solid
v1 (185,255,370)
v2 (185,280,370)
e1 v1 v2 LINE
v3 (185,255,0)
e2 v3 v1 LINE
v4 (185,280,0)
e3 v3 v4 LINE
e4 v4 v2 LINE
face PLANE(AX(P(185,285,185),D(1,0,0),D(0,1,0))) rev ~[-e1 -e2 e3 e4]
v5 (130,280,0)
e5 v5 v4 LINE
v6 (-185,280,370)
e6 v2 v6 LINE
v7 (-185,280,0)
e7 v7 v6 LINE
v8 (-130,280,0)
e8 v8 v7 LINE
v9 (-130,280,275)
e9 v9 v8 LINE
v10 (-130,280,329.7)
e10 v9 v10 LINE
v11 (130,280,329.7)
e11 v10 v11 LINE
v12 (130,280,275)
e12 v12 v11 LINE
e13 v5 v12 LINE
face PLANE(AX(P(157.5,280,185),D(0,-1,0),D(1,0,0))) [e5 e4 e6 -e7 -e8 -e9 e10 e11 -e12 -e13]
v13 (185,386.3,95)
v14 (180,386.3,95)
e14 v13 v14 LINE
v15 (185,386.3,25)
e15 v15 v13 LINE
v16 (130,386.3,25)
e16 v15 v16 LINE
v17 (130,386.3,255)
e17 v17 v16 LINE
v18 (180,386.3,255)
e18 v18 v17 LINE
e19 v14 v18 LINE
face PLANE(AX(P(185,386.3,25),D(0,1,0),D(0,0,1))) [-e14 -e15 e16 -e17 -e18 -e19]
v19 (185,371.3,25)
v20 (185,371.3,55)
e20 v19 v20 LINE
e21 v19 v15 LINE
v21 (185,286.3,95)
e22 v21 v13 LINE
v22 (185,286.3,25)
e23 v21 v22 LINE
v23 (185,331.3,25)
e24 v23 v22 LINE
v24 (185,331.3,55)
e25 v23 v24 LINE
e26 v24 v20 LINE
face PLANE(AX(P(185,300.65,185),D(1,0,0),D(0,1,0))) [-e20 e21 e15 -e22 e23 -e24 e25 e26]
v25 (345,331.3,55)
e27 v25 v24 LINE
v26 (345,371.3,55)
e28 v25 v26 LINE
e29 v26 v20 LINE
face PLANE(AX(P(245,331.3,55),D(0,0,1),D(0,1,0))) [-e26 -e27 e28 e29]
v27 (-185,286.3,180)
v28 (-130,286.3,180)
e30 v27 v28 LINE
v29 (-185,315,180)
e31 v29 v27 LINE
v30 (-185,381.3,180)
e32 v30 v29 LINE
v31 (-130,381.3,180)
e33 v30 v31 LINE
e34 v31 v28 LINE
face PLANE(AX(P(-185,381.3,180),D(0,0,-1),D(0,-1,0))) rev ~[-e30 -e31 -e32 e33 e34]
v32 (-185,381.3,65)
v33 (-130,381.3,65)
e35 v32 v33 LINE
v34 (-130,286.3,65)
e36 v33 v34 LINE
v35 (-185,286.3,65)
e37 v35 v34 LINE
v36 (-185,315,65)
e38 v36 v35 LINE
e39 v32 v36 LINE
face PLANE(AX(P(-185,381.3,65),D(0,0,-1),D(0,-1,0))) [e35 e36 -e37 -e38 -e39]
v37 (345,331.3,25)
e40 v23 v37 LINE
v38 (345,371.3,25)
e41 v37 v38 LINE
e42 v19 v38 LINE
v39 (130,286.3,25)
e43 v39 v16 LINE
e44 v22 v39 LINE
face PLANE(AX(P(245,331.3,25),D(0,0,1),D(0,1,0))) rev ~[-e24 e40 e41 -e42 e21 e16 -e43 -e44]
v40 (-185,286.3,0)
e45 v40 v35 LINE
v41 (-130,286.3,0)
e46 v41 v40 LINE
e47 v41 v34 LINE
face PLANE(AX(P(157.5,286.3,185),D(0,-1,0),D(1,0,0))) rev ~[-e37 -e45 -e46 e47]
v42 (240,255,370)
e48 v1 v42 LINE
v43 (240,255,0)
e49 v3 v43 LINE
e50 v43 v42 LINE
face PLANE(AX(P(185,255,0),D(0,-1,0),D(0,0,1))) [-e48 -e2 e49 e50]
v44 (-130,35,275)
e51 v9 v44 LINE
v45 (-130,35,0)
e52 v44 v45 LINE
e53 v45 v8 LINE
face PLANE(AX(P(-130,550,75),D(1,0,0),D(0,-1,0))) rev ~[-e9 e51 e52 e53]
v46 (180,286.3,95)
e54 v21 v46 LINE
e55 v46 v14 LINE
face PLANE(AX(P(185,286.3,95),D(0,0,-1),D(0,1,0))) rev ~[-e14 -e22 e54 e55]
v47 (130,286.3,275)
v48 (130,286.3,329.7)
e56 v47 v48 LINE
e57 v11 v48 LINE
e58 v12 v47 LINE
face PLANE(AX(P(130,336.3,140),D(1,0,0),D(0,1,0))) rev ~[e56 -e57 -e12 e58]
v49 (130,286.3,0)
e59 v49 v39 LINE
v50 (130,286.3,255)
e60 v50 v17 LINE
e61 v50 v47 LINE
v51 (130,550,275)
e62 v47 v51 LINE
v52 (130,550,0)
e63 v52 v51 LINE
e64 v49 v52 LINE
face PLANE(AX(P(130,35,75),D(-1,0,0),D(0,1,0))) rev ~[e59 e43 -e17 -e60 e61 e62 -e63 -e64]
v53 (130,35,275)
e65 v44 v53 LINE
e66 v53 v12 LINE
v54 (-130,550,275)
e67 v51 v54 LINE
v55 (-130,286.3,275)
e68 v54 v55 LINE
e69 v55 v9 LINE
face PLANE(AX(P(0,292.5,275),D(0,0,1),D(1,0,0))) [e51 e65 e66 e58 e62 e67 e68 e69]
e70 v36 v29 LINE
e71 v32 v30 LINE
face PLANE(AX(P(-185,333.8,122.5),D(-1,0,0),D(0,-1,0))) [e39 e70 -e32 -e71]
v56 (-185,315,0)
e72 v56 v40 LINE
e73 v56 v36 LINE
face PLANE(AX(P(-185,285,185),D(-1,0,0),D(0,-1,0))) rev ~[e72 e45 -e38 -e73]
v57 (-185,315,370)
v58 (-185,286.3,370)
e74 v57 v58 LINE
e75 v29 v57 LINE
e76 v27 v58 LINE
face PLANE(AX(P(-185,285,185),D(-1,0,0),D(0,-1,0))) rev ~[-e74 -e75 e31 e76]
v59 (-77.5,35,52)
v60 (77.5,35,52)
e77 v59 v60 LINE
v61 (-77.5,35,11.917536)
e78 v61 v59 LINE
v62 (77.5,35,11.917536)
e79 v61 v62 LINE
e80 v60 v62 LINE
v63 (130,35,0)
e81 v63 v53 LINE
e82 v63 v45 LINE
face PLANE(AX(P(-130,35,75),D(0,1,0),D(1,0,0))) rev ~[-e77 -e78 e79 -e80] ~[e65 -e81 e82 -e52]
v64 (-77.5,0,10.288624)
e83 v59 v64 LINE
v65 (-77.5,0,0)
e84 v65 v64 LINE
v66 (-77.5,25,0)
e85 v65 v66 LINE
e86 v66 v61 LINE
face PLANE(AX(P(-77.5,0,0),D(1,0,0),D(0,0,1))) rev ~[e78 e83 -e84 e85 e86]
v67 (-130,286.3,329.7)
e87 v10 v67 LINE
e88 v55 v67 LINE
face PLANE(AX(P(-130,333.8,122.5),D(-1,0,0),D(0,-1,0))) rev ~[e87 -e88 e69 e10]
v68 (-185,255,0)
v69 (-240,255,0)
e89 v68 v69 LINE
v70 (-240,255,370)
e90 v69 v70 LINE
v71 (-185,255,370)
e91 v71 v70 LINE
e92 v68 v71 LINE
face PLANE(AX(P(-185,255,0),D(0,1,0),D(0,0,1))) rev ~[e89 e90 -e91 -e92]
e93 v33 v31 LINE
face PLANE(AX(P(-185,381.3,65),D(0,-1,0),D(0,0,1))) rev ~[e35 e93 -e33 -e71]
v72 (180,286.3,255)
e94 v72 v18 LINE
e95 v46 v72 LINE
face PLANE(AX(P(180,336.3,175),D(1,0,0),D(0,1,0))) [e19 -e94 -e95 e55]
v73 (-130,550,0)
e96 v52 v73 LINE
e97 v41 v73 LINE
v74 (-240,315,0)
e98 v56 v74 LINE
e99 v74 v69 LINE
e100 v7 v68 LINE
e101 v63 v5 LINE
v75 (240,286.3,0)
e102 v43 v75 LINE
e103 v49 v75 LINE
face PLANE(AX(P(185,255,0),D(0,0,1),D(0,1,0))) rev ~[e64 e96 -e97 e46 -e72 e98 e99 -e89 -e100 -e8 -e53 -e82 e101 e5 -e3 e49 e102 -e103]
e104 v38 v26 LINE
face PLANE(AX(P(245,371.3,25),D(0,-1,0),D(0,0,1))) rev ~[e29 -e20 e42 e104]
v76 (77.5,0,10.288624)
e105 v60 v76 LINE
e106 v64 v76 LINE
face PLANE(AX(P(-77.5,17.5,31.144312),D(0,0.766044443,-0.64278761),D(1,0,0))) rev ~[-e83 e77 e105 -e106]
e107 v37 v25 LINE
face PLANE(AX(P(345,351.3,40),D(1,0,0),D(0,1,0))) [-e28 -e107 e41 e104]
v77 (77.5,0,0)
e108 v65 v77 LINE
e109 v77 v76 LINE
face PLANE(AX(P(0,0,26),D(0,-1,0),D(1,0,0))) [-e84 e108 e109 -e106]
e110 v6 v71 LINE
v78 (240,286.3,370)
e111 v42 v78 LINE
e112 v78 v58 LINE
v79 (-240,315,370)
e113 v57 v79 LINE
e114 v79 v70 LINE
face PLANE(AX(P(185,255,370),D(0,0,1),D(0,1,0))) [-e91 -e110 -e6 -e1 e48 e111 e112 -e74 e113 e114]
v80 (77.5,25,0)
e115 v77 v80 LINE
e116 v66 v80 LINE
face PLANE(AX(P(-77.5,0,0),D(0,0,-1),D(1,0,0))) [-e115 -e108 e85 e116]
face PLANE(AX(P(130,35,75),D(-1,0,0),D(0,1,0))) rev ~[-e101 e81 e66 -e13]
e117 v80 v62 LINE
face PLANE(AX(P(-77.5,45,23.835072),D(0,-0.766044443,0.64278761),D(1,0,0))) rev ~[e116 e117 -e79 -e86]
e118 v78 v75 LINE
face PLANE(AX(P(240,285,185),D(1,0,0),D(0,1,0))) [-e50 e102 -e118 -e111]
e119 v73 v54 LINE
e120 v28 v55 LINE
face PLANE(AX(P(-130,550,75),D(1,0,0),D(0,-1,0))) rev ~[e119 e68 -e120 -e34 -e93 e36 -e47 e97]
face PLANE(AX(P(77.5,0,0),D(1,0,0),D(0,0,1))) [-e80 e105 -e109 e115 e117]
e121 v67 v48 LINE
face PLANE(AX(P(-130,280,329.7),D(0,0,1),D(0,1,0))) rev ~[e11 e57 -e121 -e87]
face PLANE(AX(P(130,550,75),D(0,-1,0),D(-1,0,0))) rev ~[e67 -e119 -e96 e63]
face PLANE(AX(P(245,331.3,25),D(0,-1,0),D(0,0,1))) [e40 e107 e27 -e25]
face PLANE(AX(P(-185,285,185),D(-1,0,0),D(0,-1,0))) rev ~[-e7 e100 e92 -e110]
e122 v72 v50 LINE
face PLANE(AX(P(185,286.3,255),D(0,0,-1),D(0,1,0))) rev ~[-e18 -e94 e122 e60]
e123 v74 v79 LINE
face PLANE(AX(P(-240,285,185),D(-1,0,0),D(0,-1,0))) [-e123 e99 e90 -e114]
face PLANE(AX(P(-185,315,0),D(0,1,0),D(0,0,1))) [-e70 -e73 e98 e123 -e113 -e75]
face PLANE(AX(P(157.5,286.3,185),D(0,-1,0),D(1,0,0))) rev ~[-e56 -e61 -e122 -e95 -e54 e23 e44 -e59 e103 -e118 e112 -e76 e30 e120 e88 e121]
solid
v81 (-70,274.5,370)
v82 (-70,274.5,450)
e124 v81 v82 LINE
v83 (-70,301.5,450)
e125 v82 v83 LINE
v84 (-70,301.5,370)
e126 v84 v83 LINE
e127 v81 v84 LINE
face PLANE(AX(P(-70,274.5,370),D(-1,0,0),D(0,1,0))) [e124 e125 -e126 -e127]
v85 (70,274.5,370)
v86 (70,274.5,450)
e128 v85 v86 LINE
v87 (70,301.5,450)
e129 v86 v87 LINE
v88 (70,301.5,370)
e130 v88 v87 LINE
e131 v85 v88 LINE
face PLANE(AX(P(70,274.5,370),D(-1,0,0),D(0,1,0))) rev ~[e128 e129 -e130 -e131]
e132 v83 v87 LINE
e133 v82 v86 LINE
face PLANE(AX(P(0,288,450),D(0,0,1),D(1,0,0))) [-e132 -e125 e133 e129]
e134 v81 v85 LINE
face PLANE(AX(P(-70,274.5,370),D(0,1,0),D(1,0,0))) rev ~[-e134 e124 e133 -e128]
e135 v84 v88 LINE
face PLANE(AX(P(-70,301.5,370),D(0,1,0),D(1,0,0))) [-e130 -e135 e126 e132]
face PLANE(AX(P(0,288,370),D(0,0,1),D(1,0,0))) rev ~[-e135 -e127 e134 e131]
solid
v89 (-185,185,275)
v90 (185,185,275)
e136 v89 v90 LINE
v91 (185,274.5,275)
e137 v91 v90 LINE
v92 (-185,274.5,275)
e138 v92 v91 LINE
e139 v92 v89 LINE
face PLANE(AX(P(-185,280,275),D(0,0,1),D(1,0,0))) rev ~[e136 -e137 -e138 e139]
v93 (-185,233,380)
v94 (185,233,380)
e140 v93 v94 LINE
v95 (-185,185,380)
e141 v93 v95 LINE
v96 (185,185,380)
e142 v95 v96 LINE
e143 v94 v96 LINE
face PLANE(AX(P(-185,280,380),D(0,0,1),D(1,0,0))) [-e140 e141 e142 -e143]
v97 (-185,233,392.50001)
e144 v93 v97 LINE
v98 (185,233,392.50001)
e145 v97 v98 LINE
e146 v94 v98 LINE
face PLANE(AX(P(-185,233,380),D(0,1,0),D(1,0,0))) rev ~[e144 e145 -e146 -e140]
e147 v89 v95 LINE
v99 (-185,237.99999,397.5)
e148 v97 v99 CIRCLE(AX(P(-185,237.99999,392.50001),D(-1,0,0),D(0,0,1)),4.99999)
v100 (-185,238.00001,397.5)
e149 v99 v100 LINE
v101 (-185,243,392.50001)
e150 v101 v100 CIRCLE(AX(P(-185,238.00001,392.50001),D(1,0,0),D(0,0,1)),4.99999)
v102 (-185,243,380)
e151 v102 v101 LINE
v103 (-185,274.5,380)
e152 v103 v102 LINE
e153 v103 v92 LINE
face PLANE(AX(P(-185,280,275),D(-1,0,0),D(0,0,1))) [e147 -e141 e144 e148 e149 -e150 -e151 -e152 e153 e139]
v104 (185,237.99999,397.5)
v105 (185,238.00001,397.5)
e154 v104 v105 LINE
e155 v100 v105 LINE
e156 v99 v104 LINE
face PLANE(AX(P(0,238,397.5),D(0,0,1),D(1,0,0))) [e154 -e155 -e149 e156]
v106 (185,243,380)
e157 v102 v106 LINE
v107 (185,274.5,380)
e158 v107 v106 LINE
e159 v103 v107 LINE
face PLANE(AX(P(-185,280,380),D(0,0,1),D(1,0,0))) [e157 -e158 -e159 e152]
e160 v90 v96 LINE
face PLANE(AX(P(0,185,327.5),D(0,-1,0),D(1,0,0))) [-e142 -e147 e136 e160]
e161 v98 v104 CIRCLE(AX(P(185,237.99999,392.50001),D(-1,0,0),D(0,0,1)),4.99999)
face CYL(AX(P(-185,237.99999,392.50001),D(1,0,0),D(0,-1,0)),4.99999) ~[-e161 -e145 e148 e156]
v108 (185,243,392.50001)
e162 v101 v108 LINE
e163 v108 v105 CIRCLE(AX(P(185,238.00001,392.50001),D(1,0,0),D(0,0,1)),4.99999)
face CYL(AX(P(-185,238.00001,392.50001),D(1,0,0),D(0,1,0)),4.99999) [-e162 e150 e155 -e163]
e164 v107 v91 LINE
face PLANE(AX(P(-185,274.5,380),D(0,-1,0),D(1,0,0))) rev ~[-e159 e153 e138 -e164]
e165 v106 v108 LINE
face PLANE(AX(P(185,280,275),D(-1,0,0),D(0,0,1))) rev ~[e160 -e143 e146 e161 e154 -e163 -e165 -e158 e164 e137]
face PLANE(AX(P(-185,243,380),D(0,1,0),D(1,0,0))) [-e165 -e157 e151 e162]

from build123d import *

# Parameters (mm, degrees)
F0_W      = 155
F0_H      = 52
F1_DEPTH  = 65
F2_SIZE2  = 41.7113757408
F2_SIZE   = 35
F3_SIZE2  = 47.6701437038
F3_SIZE   = 40
F4_W      = 60.4387485981
F4_H      = 52
F5_DEPTH  = 155.001
F6_W      = 260
F6_H      = 75
F7_DEPTH  = 435
F8_W      = 6.3
F8_H      = 370
F9_DEPTH  = 55
F10_W     = 6.3
F10_H     = 40.3
F11_DEPTH = 260
F12_W     = 55
F12_H     = 370
F13_DEPTH = 6.3
F14_W     = 95
F14_H     = 115
F15_DEPTH = 55
F16_W     = 100
F16_H     = 230
F17_DEPTH = 55
F18_W     = 260
F18_H     = 75
F19_DEPTH = 80
F20_W     = 40
F20_H     = 30
F21_DEPTH = 60
F22_W     = 60
F22_H     = 370
F23_DEPTH = 55
F24_W     = 60
F24_H     = 370
F25_DEPTH = 55
F27_DEPTH = 55
F29_DEPTH = 200
F30_W     = 370
F30_H     = 105
F31_DEPTH = 95
F32_W     = 370
F32_H     = 10
F33_DEPTH = 17.5
F34_R     = 4.99999
F35_W     = 370
F35_H     = 5.5
F36_DEPTH = 105
F37_W     = 140
F37_H     = 27
F38_DEPTH = 80
F39_DEPTH = 100
F40_W     = 100
F40_H     = 160
F41_DEPTH = 5


# Not quite as in the source:
# - a fillet or chamfer is up to 0.001 mm smaller than in the source, because OpenCascade refuses the exact size


with BuildPart() as f1:
    # F0 (on Front) → F1 (new body)
    with BuildSketch(Plane.XZ):
        with Locations((0, 26)):
            Rectangle(F0_W, F0_H)
    extrude(amount=-F1_DEPTH)

    # F2
    f2_edges = [f1.edges().sort_by_distance(p)[0] for p in [
        (0, 0, 52),
    ]]
    f2_side = f1.faces().sort_by_distance((0, 32.5, 52))[0]
    chamfer(f2_edges, length=F2_SIZE, length2=F2_SIZE2, reference=f2_side)

    # F3
    f3_edges = [f1.edges().sort_by_distance(p)[0] for p in [
        (0, 65, 0),
    ]]
    f3_side = f1.faces().sort_by_distance((0, 32.5, 0))[0]
    chamfer(f3_edges, length=F3_SIZE, length2=F3_SIZE2, reference=f3_side)

    # F4 (on face) → F5 (cut, through all)
    with BuildSketch(Plane(origin=(-77.5, 0, 0), x_dir=(0, -1, 0), z_dir=(-1, 0, 0))):
        with Locations((-65.219374299, 26)):
            Rectangle(F4_W, F4_H)
    extrude(amount=-F5_DEPTH, mode=Mode.SUBTRACT)

    # F6 (on face) → F7 (join)
    with BuildSketch(Plane(origin=(0, 35, 0), x_dir=(-1, 0, 0), z_dir=(0, 1, 0))):
        with Locations((0, 37.5)):
            Rectangle(F6_W, F6_H)
    extrude(amount=F7_DEPTH)

    # F8 (on face) → F9 (join)
    with BuildSketch(Plane(origin=(-130, 0, 0), x_dir=(0, -1, 0), z_dir=(-1, 0, 0))):
        with Locations((-283.15, 185)):
            Rectangle(F8_W, F8_H)
    extrude(amount=F9_DEPTH)

    # F10 (on face) → F11 (join)
    with BuildSketch(Plane.YZ.offset(-130)):
        with Locations((283.15, 349.85)):
            Rectangle(F10_W, F10_H)
    extrude(amount=F11_DEPTH)

    # F12 (on face) → F13 (join)
    with BuildSketch(Plane.XZ.offset(-280)):
        with Locations((157.5, 185)):
            Rectangle(F12_W, F12_H)
    extrude(amount=-F13_DEPTH)

    # F14 (on face) → F15 (join)
    with BuildSketch(Plane(origin=(-185, 0, 0), x_dir=(0, -1, 0), z_dir=(-1, 0, 0))):
        with Locations((-333.8, 122.5)):
            Rectangle(F14_W, F14_H)
    extrude(amount=-F15_DEPTH)

    # F16 (on face) → F17 (join)
    with BuildSketch(Plane.YZ.offset(185)):
        with Locations((336.3, 140)):
            Rectangle(F16_W, F16_H)
    extrude(amount=-F17_DEPTH)

    # F18 (on face) → F19 (join)
    with BuildSketch(Plane(origin=(0, 470, 0), x_dir=(-1, 0, 0), z_dir=(0, 1, 0))):
        with Locations((0, 37.5)):
            Rectangle(F18_W, F18_H)
    extrude(amount=F19_DEPTH)

    # F20 (on face) → F21 (join)
    with BuildSketch(Plane.YZ.offset(185)):
        with Locations((351.3, 40)):
            Rectangle(F20_W, F20_H)
    extrude(amount=F21_DEPTH)

    # F22 (on face) → F23 (join)
    with BuildSketch(Plane(origin=(-185, 0, 0), x_dir=(0, -1, 0), z_dir=(-1, 0, 0))):
        with Locations((-285, 185)):
            Rectangle(F22_W, F22_H)
    extrude(amount=F23_DEPTH)

    # F24 (on face) → F25 (join)
    with BuildSketch(Plane.YZ.offset(185)):
        with Locations((285, 185)):
            Rectangle(F24_W, F24_H)
    extrude(amount=F25_DEPTH)

    # F26 (on face) → F27 (cut)
    with BuildSketch(Plane.YZ.offset(240)):
        Polygon((315, 0), (315, 25), (315, 255), (315, 370), (286.3, 370), (286.3, 255), (286.3, 0), align=None)
    extrude(amount=-F27_DEPTH, mode=Mode.SUBTRACT)

    # F28 (on face) → F29 (join)
    with BuildSketch(Plane.XY.offset(75)):
        Polygon((-130, 381.3), (-130, 280), (-130, 35), (130, 35), (130, 280), (130, 386.3), (130, 550), (-130, 550), align=None)
    extrude(amount=F29_DEPTH)

    # F39 (add): a face of the model
    f39_faces = [f1.faces().sort_by_distance(p)[0] for p in [
        (245, 351.3, 40),
    ]]
    extrude(f39_faces, amount=F39_DEPTH)

    # F40 (on face) → F41 (cut)
    with BuildSketch(Plane.YZ.offset(185)):
        with Locations((336.3, 175)):
            Rectangle(F40_W, F40_H)
    extrude(amount=-F41_DEPTH, mode=Mode.SUBTRACT)


with BuildPart() as f31:
    # F30 (on face) → F31 (new body)
    with BuildSketch(Plane.XZ.offset(-280)):
        with Locations((0, 327.5)):
            Rectangle(F30_W, F30_H)
    extrude(amount=F31_DEPTH)

    # F32 (on face) → F33 (join)
    with BuildSketch(Plane.XY.offset(380)):
        with Locations((0, 238)):
            Rectangle(F32_W, F32_H)
    extrude(amount=F33_DEPTH)

    # F34 (radius 5 in the source; OpenCascade refuses exactly that, so slightly less here)
    f34_edges = [f31.edges().sort_by_distance(p)[0] for p in [
        (0, 233, 397.5),
        (0, 243, 397.5),
    ]]
    fillet(f34_edges, radius=F34_R)

    # F35 (on face) → F36 (cut)
    with BuildSketch(Plane.XY.offset(380)):
        with Locations((0, 277.25)):
            Rectangle(F35_W, F35_H)
    extrude(amount=-F36_DEPTH, mode=Mode.SUBTRACT)


with BuildPart() as f38:
    # F37 (on face) → F38 (new body)
    with BuildSketch(Plane.XY.offset(370)):
        with Locations((0, 288)):
            Rectangle(F37_W, F37_H)
    extrude(amount=F38_DEPTH)


solid = Compound([f1.part, f31.part, f38.part])
